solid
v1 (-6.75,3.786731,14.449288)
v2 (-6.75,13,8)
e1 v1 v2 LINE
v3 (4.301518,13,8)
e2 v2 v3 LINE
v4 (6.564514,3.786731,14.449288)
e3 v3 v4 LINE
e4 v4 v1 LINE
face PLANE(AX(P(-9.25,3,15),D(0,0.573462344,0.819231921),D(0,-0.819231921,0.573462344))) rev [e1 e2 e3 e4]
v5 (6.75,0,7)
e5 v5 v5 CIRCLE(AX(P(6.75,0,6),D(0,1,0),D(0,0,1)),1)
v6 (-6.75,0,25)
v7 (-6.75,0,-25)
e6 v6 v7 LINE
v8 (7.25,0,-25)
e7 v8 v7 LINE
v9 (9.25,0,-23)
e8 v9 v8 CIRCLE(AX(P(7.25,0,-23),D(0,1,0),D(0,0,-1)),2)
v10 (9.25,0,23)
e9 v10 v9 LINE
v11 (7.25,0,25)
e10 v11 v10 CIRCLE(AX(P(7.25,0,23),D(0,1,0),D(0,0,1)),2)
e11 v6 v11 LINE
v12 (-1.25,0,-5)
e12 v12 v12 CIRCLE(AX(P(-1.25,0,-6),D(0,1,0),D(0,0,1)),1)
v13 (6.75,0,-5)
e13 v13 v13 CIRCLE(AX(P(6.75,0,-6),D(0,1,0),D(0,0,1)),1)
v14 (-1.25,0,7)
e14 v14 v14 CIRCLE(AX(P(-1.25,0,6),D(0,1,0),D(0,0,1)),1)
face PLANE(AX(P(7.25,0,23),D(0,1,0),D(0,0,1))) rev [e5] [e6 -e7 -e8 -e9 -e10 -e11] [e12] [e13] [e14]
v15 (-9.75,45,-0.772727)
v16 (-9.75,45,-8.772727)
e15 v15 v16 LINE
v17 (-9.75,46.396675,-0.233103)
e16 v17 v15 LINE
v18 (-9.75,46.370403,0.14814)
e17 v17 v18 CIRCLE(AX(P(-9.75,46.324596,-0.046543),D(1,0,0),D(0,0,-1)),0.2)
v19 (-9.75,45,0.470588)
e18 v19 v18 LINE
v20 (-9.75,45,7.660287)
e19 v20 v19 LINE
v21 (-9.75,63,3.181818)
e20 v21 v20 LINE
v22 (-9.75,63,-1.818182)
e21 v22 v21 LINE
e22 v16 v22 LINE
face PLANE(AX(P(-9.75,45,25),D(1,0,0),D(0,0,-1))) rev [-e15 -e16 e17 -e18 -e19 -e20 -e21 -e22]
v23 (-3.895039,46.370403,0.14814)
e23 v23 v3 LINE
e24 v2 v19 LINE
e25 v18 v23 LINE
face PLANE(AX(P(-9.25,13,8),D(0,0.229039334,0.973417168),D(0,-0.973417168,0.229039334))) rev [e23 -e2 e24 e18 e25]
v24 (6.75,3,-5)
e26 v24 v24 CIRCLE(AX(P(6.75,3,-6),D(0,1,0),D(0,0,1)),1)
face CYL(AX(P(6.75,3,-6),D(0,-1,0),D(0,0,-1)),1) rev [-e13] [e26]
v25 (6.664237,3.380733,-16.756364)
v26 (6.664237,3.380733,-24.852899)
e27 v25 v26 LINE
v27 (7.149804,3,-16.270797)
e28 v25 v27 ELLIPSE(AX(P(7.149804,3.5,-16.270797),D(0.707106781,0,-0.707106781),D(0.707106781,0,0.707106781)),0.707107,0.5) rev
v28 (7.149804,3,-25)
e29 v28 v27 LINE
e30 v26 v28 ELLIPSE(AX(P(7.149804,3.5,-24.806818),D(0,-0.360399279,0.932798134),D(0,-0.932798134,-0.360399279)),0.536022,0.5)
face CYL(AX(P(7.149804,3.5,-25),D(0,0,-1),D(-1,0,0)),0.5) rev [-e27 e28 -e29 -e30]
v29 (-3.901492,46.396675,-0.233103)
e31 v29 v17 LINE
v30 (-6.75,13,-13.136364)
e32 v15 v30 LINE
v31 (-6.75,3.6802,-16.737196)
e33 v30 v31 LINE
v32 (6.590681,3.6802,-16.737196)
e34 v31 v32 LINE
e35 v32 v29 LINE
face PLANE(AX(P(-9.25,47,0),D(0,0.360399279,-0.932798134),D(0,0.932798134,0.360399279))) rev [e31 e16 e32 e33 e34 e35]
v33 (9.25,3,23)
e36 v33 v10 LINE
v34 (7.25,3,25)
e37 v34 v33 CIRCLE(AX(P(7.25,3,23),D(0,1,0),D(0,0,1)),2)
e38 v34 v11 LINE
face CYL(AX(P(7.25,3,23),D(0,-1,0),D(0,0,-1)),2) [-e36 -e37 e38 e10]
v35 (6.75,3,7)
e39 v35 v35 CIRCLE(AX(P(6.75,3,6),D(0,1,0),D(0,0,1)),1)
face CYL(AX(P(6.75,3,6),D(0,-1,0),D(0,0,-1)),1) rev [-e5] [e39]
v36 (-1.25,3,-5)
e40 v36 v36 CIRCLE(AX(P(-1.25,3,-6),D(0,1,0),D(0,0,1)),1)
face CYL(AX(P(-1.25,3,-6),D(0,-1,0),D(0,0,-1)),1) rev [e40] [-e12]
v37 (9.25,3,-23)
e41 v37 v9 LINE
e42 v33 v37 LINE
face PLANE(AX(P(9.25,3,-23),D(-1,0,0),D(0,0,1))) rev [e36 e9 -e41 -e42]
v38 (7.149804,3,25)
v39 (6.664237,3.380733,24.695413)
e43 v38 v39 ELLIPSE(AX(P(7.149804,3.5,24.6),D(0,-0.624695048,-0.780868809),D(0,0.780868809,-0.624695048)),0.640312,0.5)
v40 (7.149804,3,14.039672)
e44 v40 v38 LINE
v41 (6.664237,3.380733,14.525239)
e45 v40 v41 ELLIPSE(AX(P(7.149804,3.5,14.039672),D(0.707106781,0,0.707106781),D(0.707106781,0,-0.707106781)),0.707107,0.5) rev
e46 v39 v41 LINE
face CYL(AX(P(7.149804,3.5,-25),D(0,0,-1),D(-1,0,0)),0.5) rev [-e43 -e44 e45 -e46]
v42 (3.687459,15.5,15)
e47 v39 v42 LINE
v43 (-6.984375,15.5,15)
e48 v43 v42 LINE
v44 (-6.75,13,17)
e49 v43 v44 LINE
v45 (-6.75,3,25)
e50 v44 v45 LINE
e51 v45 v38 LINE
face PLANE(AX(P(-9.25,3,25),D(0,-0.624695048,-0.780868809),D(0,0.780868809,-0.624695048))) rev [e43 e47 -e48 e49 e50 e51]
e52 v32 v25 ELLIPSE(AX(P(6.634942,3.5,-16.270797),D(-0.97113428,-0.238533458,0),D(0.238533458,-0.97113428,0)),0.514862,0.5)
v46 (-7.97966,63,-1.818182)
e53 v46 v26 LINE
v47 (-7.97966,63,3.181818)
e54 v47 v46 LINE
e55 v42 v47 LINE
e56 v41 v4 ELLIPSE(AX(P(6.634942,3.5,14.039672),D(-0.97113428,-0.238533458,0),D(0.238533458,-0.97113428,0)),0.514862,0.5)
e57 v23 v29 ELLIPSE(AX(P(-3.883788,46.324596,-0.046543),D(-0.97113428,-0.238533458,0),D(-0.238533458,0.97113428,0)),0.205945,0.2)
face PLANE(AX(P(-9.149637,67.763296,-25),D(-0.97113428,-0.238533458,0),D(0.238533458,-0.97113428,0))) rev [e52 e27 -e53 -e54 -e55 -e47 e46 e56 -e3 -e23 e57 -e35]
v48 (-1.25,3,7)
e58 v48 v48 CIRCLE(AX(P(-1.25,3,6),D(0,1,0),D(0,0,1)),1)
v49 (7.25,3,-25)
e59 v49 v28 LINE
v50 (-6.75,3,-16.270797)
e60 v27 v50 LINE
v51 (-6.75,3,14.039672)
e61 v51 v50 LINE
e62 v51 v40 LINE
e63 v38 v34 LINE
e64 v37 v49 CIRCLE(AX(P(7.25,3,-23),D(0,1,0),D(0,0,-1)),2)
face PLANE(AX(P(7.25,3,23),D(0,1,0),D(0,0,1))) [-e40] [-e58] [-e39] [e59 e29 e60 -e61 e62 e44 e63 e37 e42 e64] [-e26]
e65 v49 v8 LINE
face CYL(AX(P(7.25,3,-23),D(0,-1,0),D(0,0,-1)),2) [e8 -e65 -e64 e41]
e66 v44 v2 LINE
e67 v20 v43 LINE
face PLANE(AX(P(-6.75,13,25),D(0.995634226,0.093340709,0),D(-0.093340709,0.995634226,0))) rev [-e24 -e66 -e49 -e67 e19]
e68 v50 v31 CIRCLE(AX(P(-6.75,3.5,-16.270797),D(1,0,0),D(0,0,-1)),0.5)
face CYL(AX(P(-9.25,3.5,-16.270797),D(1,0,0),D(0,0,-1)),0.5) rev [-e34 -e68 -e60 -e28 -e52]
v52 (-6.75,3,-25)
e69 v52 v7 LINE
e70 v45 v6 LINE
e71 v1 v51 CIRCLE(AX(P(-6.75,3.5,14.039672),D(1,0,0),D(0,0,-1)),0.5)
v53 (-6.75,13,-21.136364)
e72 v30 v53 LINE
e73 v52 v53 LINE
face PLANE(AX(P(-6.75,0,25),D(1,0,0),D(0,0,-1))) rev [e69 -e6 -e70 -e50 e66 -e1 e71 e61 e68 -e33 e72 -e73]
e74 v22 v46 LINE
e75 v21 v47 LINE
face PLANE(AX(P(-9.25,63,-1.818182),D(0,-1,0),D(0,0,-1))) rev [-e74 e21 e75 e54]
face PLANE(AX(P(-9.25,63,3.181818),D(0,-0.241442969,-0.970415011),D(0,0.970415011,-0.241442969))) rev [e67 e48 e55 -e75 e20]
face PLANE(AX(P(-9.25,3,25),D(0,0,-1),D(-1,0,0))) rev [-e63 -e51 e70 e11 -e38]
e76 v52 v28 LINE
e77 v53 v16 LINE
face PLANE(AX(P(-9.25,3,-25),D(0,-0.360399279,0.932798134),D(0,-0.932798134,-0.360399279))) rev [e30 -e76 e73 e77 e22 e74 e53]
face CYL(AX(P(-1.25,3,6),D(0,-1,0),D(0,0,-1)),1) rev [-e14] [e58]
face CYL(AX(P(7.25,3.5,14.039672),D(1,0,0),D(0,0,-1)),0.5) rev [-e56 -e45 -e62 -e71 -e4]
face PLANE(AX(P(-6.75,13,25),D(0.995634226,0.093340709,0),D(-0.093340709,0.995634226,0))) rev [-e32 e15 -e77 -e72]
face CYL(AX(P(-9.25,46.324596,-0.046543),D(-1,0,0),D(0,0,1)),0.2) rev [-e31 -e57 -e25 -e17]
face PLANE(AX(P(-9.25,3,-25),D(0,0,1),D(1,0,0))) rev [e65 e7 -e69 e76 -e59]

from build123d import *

# Parameters (mm, degrees)
SKETCH_1_R          = 1
EXTRUDE_1_DEPTH     = 3
SKETCH_2_W          = 16.007753667
SKETCH_2_H          = 50
EXTRUDE_2_DEPTH     = 80
CUT_EXTRUDE_1_DEPTH = 89.149011211
CUT_EXTRUDE_2_DEPTH = 81.960252593
EXTRUDE_3_DEPTH     = 3
CUT_EXTRUDE_3_DEPTH = 82.357621032
FILLET_1_R          = 0.5
FILLET_2_R          = 0.2


with BuildPart() as part:
    # 草图1 → 凸台-拉伸1 (new body)
    with BuildSketch(Plane(origin=(0, 0, 0), x_dir=(1, 0, 0), z_dir=(0, 1, 0))):
        with BuildLine():
            Line((-9.25, 25), (7.25, 25))
            ThreePointArc((7.25, 25), (8.664213562, 24.414213562), (9.25, 23))
            Line((9.25, 23), (9.25, -23))
            ThreePointArc((9.25, -23), (8.664213562, -24.414213562), (7.25, -25))
            Line((7.25, -25), (-9.25, -25))
            Line((-9.25, -25), (-9.25, 25))
        make_face()
        with Locations(Location((-1.25, 6, 0), (0, 0, 270))):
            Circle(SKETCH_1_R, mode=Mode.SUBTRACT)
        with Locations(Location((-1.25, -6, 0), (0, 0, 270))):
            Circle(SKETCH_1_R, mode=Mode.SUBTRACT)
        with Locations(Location((6.75, -6, 0), (0, 0, 270))):
            Circle(SKETCH_1_R, mode=Mode.SUBTRACT)
        with Locations(Location((6.75, 6, 0), (0, 0, 270))):
            Circle(SKETCH_1_R, mode=Mode.SUBTRACT)
    extrude(amount=EXTRUDE_1_DEPTH)

    # 草图2 → 凸台-拉伸2 (add)
    with BuildSketch(Plane(origin=(0, 3, 0), x_dir=(1, 0, 0), z_dir=(0, 1, 0))):
        with Locations((-1.246123166, 0)):
            Rectangle(SKETCH_2_W, SKETCH_2_H)
    extrude(amount=EXTRUDE_2_DEPTH)

    # 草图3 → 切除-拉伸1 (cut, through all)
    with BuildSketch(Plane(origin=(6.757753667, 0, 0), x_dir=(0, 0, -1), z_dir=(1, 0, 0))):
        Polygon((-25, 3), (-15, 15.5), (-3.181818182, 63), (1.818181818, 63), (25, 3), (32.784332669, 3), (32.784332669, 88.133626677), (-39.086773644, 88.133626677), (-39.086773644, 3), align=None)
        Polygon((-15, 3), (-8, 13), (0, 47), (17, 3), align=None)
    extrude(amount=-CUT_EXTRUDE_1_DEPTH, mode=Mode.SUBTRACT)

    # 草图4 → 切除-拉伸2 (cut, through all)
    with BuildSketch(Plane.XY.offset(25)):
        Polygon((6.757753667, 3), (6.757753667, 67.763295657), (-9.14963747, 67.763295657), align=None)
    extrude(amount=-CUT_EXTRUDE_2_DEPTH, mode=Mode.SUBTRACT)

    # 草图5 → 凸台-拉伸3 (add)
    with BuildSketch(Plane.ZY.offset(9.25)):
        Polygon((-1.818181818, 63), (-25, 3), (-25, 0), (25, 0), (25, 3), (15, 15.5), (3.181818182, 63), align=None)
        Polygon((0, 47), (-17, 3), (15, 3), (8, 13), align=None, mode=Mode.SUBTRACT)
    extrude(amount=EXTRUDE_3_DEPTH)

    # 草图6 → 切除-拉伸3 (cut, through all)
    with BuildSketch(Plane(origin=(0, 0, -25), x_dir=(-1, 0, 0), z_dir=(0, 0, -1))):
        Polygon((6.75, 0), (6.75, 13), (9.75, 45), (9.75, 64.870972757), (14.09361996, 64.870972757), (14.09361996, 0), align=None)
    extrude(amount=-CUT_EXTRUDE_3_DEPTH, mode=Mode.SUBTRACT)

    # 圆角1
    # the kernel refuses this fillet: 0.5 mm, written as the material it adds along each edge
    with BuildSketch(Plane(origin=(-6.75, 3, 15), x_dir=(0, 0, -1), z_dir=(1, 0, 0))) as fillet_1_piece_1_section:
        with BuildLine():
            CenterArc((FILLET_1_R * 1.92065556157, FILLET_1_R), FILLET_1_R, 145.007979801, 124.992020199)
            Line((FILLET_1_R * 1.10142364105, FILLET_1_R * 1.57346234436), (0, 0))
            Line((0, 0), (FILLET_1_R * 1.92065556157, 0))
        make_face()
    fillet_1_piece_1 = extrude(amount=15.908573119, mode=Mode.PRIVATE)
    fillet_1_piece_1 = split(fillet_1_piece_1, bisect_by=Plane(origin=(6.326718063, 4.754862629, 14.622728055), z_dir=(-0.9711342799096353, -0.23853345757858466, 0)), keep=Keep.TOP, mode=Mode.PRIVATE)
    add(fillet_1_piece_1)
    with BuildSketch(Plane(origin=(8.58076235, 3, -17), x_dir=(0, 0, 1), z_dir=(-1, 0, 0))) as fillet_1_piece_2_section:
        with BuildLine():
            CenterArc((FILLET_1_R * 1.45840694682, FILLET_1_R), FILLET_1_R, 158.875280854, 111.124719146)
            Line((FILLET_1_R * 0.525608812419, FILLET_1_R * 1.3603992792), (0, 0))
            Line((0, 0), (FILLET_1_R * 1.45840694682, 0))
        make_face()
    fillet_1_piece_2 = extrude(amount=15.33076235, mode=Mode.PRIVATE)
    fillet_1_piece_2 = split(fillet_1_piece_2, bisect_by=Plane(origin=(6.334852861, 4.721743663, -16.763347765), z_dir=(-0.9711342799096353, -0.23853345757858466, 0)), keep=Keep.TOP, mode=Mode.PRIVATE)
    add(fillet_1_piece_2)
    with BuildSketch(Plane(origin=(6.757753667, 3, 14.019874802), x_dir=(1, 0, 0), z_dir=(0, 0, 1))) as fillet_1_piece_3_section:
        with BuildLine():
            CenterArc((FILLET_1_R * 0.784100158108, FILLET_1_R), FILLET_1_R, 193.8, 76.2)
            Line((-FILLET_1_R * 0.187034121801, FILLET_1_R * 0.761466542421), (0, 0))
            Line((0, 0), (FILLET_1_R * 0.784100158108, 0))
        make_face()
    fillet_1_piece_3 = extrude(amount=10.980125198, mode=Mode.PRIVATE)
    fillet_1_piece_3 = split(fillet_1_piece_3, bisect_by=Plane(origin=(6.823819727, 0.737200979, 16.583959315), z_dir=(0, 0.5734623443633292, 0.8192319205190398)), keep=Keep.TOP, mode=Mode.PRIVATE)
    fillet_1_piece_3 = split(fillet_1_piece_3, bisect_by=Plane(origin=(6.823819727, 5.521194882, 22.983044095), z_dir=(0, -0.6246950475544246, -0.7808688094430302)), keep=Keep.TOP, mode=Mode.PRIVATE)
    add(fillet_1_piece_3)
    with BuildSketch(Plane(origin=(6.757753667, 3, -25), x_dir=(1, 0, 0), z_dir=(0, 0, 1))) as fillet_1_piece_4_section:
        with BuildLine():
            CenterArc((FILLET_1_R * 0.784100158108, FILLET_1_R), FILLET_1_R, 193.8, 76.2)
            Line((-FILLET_1_R * 0.187034121801, FILLET_1_R * 0.761466542421), (0, 0))
            Line((0, 0), (FILLET_1_R * 0.784100158108, 0))
        make_face()
    fillet_1_piece_4 = extrude(amount=8.980125198, mode=Mode.PRIVATE)
    fillet_1_piece_4 = split(fillet_1_piece_4, bisect_by=Plane(origin=(6.823760744, 4.428941995, -24.447908775), z_dir=(0, -0.36039927920216236, 0.9327981344055969)), keep=Keep.TOP, mode=Mode.PRIVATE)
    fillet_1_piece_4 = split(fillet_1_piece_4, bisect_by=Plane(origin=(6.823760744, 1.739503793, -17.487009898), z_dir=(0, 0.3603992792021622, -0.9327981344055969)), keep=Keep.TOP, mode=Mode.PRIVATE)
    add(fillet_1_piece_4)
    with BuildSketch(Plane(origin=(-6.75, 3, 15), x_dir=(0, 0, -1), z_dir=(1, 0, 0))) as fillet_1_piece_5a_section:
        with BuildLine():
            CenterArc((FILLET_1_R * 1.92065556157, FILLET_1_R), FILLET_1_R, 145.007979801, 124.992020199)
            Line((FILLET_1_R * 1.10142364105, FILLET_1_R * 1.57346234436), (0, 0))
            Line((0, 0), (FILLET_1_R * 1.92065556157, 0))
        make_face()
    fillet_1_piece_5a = extrude(amount=15.908573119, mode=Mode.PRIVATE)
    fillet_1_piece_5a = split(fillet_1_piece_5a, bisect_by=Plane(origin=(6.778509417, 2.915497721, 14.622764636), z_dir=(0.9711342799096353, 0.23853345757858466, 0)), keep=Keep.TOP, mode=Mode.PRIVATE)
    with BuildSketch(Plane(origin=(6.757753667, 3, 14.019874802), x_dir=(1, 0, 0), z_dir=(0, 0, 1))) as fillet_1_piece_5b_section:
        with BuildLine():
            CenterArc((FILLET_1_R * 0.784100158108, FILLET_1_R), FILLET_1_R, 193.8, 76.2)
            Line((-FILLET_1_R * 0.187034121801, FILLET_1_R * 0.761466542421), (0, 0))
            Line((0, 0), (FILLET_1_R * 0.784100158108, 0))
        make_face()
    fillet_1_piece_5b = extrude(amount=10.980125198, mode=Mode.PRIVATE)
    fillet_1_piece_5b = split(fillet_1_piece_5b, bisect_by=Plane(origin=(6.828403151, 3.296038352, 14.792773154), z_dir=(0, -0.5734623443633292, -0.8192319205190398)), keep=Keep.TOP, mode=Mode.PRIVATE)
    fillet_1_piece_5 = fillet_1_piece_5a & fillet_1_piece_5b
    add(fillet_1_piece_5)
    with BuildSketch(Plane(origin=(6.757753667, 3, -25), x_dir=(1, 0, 0), z_dir=(0, 0, 1))) as fillet_1_piece_6a_section:
        with BuildLine():
            CenterArc((FILLET_1_R * 0.784100158108, FILLET_1_R), FILLET_1_R, 193.8, 76.2)
            Line((-FILLET_1_R * 0.187034121801, FILLET_1_R * 0.761466542421), (0, 0))
            Line((0, 0), (FILLET_1_R * 0.784100158108, 0))
        make_face()
    fillet_1_piece_6a = extrude(amount=8.980125198, mode=Mode.PRIVATE)
    fillet_1_piece_6a = split(fillet_1_piece_6a, bisect_by=Plane(origin=(6.826253209, 3.240744299, -16.906985157), z_dir=(0, -0.3603992792021622, 0.9327981344055969)), keep=Keep.TOP, mode=Mode.PRIVATE)
    with BuildSketch(Plane(origin=(8.58076235, 3, -17), x_dir=(0, 0, 1), z_dir=(-1, 0, 0))) as fillet_1_piece_6b_section:
        with BuildLine():
            CenterArc((FILLET_1_R * 1.45840694682, FILLET_1_R), FILLET_1_R, 158.875280854, 111.124719146)
            Line((FILLET_1_R * 0.525608812419, FILLET_1_R * 1.3603992792), (0, 0))
            Line((0, 0), (FILLET_1_R * 1.45840694682, 0))
        make_face()
    fillet_1_piece_6b = extrude(amount=15.33076235, mode=Mode.PRIVATE)
    fillet_1_piece_6b = split(fillet_1_piece_6b, bisect_by=Plane(origin=(6.770254608, 2.949105284, -16.764105763), z_dir=(0.9711342799096353, 0.23853345757858466, 0)), keep=Keep.TOP, mode=Mode.PRIVATE)
    fillet_1_piece_6 = fillet_1_piece_6a & fillet_1_piece_6b
    add(fillet_1_piece_6)

    # 圆角2
    fillet_2_edges = [part.edges().sort_by_distance(p)[0] for p in [
        (-6.899841453, 47, 0),
    ]]
    fillet(fillet_2_edges, radius=FILLET_2_R)


solid = part.part
